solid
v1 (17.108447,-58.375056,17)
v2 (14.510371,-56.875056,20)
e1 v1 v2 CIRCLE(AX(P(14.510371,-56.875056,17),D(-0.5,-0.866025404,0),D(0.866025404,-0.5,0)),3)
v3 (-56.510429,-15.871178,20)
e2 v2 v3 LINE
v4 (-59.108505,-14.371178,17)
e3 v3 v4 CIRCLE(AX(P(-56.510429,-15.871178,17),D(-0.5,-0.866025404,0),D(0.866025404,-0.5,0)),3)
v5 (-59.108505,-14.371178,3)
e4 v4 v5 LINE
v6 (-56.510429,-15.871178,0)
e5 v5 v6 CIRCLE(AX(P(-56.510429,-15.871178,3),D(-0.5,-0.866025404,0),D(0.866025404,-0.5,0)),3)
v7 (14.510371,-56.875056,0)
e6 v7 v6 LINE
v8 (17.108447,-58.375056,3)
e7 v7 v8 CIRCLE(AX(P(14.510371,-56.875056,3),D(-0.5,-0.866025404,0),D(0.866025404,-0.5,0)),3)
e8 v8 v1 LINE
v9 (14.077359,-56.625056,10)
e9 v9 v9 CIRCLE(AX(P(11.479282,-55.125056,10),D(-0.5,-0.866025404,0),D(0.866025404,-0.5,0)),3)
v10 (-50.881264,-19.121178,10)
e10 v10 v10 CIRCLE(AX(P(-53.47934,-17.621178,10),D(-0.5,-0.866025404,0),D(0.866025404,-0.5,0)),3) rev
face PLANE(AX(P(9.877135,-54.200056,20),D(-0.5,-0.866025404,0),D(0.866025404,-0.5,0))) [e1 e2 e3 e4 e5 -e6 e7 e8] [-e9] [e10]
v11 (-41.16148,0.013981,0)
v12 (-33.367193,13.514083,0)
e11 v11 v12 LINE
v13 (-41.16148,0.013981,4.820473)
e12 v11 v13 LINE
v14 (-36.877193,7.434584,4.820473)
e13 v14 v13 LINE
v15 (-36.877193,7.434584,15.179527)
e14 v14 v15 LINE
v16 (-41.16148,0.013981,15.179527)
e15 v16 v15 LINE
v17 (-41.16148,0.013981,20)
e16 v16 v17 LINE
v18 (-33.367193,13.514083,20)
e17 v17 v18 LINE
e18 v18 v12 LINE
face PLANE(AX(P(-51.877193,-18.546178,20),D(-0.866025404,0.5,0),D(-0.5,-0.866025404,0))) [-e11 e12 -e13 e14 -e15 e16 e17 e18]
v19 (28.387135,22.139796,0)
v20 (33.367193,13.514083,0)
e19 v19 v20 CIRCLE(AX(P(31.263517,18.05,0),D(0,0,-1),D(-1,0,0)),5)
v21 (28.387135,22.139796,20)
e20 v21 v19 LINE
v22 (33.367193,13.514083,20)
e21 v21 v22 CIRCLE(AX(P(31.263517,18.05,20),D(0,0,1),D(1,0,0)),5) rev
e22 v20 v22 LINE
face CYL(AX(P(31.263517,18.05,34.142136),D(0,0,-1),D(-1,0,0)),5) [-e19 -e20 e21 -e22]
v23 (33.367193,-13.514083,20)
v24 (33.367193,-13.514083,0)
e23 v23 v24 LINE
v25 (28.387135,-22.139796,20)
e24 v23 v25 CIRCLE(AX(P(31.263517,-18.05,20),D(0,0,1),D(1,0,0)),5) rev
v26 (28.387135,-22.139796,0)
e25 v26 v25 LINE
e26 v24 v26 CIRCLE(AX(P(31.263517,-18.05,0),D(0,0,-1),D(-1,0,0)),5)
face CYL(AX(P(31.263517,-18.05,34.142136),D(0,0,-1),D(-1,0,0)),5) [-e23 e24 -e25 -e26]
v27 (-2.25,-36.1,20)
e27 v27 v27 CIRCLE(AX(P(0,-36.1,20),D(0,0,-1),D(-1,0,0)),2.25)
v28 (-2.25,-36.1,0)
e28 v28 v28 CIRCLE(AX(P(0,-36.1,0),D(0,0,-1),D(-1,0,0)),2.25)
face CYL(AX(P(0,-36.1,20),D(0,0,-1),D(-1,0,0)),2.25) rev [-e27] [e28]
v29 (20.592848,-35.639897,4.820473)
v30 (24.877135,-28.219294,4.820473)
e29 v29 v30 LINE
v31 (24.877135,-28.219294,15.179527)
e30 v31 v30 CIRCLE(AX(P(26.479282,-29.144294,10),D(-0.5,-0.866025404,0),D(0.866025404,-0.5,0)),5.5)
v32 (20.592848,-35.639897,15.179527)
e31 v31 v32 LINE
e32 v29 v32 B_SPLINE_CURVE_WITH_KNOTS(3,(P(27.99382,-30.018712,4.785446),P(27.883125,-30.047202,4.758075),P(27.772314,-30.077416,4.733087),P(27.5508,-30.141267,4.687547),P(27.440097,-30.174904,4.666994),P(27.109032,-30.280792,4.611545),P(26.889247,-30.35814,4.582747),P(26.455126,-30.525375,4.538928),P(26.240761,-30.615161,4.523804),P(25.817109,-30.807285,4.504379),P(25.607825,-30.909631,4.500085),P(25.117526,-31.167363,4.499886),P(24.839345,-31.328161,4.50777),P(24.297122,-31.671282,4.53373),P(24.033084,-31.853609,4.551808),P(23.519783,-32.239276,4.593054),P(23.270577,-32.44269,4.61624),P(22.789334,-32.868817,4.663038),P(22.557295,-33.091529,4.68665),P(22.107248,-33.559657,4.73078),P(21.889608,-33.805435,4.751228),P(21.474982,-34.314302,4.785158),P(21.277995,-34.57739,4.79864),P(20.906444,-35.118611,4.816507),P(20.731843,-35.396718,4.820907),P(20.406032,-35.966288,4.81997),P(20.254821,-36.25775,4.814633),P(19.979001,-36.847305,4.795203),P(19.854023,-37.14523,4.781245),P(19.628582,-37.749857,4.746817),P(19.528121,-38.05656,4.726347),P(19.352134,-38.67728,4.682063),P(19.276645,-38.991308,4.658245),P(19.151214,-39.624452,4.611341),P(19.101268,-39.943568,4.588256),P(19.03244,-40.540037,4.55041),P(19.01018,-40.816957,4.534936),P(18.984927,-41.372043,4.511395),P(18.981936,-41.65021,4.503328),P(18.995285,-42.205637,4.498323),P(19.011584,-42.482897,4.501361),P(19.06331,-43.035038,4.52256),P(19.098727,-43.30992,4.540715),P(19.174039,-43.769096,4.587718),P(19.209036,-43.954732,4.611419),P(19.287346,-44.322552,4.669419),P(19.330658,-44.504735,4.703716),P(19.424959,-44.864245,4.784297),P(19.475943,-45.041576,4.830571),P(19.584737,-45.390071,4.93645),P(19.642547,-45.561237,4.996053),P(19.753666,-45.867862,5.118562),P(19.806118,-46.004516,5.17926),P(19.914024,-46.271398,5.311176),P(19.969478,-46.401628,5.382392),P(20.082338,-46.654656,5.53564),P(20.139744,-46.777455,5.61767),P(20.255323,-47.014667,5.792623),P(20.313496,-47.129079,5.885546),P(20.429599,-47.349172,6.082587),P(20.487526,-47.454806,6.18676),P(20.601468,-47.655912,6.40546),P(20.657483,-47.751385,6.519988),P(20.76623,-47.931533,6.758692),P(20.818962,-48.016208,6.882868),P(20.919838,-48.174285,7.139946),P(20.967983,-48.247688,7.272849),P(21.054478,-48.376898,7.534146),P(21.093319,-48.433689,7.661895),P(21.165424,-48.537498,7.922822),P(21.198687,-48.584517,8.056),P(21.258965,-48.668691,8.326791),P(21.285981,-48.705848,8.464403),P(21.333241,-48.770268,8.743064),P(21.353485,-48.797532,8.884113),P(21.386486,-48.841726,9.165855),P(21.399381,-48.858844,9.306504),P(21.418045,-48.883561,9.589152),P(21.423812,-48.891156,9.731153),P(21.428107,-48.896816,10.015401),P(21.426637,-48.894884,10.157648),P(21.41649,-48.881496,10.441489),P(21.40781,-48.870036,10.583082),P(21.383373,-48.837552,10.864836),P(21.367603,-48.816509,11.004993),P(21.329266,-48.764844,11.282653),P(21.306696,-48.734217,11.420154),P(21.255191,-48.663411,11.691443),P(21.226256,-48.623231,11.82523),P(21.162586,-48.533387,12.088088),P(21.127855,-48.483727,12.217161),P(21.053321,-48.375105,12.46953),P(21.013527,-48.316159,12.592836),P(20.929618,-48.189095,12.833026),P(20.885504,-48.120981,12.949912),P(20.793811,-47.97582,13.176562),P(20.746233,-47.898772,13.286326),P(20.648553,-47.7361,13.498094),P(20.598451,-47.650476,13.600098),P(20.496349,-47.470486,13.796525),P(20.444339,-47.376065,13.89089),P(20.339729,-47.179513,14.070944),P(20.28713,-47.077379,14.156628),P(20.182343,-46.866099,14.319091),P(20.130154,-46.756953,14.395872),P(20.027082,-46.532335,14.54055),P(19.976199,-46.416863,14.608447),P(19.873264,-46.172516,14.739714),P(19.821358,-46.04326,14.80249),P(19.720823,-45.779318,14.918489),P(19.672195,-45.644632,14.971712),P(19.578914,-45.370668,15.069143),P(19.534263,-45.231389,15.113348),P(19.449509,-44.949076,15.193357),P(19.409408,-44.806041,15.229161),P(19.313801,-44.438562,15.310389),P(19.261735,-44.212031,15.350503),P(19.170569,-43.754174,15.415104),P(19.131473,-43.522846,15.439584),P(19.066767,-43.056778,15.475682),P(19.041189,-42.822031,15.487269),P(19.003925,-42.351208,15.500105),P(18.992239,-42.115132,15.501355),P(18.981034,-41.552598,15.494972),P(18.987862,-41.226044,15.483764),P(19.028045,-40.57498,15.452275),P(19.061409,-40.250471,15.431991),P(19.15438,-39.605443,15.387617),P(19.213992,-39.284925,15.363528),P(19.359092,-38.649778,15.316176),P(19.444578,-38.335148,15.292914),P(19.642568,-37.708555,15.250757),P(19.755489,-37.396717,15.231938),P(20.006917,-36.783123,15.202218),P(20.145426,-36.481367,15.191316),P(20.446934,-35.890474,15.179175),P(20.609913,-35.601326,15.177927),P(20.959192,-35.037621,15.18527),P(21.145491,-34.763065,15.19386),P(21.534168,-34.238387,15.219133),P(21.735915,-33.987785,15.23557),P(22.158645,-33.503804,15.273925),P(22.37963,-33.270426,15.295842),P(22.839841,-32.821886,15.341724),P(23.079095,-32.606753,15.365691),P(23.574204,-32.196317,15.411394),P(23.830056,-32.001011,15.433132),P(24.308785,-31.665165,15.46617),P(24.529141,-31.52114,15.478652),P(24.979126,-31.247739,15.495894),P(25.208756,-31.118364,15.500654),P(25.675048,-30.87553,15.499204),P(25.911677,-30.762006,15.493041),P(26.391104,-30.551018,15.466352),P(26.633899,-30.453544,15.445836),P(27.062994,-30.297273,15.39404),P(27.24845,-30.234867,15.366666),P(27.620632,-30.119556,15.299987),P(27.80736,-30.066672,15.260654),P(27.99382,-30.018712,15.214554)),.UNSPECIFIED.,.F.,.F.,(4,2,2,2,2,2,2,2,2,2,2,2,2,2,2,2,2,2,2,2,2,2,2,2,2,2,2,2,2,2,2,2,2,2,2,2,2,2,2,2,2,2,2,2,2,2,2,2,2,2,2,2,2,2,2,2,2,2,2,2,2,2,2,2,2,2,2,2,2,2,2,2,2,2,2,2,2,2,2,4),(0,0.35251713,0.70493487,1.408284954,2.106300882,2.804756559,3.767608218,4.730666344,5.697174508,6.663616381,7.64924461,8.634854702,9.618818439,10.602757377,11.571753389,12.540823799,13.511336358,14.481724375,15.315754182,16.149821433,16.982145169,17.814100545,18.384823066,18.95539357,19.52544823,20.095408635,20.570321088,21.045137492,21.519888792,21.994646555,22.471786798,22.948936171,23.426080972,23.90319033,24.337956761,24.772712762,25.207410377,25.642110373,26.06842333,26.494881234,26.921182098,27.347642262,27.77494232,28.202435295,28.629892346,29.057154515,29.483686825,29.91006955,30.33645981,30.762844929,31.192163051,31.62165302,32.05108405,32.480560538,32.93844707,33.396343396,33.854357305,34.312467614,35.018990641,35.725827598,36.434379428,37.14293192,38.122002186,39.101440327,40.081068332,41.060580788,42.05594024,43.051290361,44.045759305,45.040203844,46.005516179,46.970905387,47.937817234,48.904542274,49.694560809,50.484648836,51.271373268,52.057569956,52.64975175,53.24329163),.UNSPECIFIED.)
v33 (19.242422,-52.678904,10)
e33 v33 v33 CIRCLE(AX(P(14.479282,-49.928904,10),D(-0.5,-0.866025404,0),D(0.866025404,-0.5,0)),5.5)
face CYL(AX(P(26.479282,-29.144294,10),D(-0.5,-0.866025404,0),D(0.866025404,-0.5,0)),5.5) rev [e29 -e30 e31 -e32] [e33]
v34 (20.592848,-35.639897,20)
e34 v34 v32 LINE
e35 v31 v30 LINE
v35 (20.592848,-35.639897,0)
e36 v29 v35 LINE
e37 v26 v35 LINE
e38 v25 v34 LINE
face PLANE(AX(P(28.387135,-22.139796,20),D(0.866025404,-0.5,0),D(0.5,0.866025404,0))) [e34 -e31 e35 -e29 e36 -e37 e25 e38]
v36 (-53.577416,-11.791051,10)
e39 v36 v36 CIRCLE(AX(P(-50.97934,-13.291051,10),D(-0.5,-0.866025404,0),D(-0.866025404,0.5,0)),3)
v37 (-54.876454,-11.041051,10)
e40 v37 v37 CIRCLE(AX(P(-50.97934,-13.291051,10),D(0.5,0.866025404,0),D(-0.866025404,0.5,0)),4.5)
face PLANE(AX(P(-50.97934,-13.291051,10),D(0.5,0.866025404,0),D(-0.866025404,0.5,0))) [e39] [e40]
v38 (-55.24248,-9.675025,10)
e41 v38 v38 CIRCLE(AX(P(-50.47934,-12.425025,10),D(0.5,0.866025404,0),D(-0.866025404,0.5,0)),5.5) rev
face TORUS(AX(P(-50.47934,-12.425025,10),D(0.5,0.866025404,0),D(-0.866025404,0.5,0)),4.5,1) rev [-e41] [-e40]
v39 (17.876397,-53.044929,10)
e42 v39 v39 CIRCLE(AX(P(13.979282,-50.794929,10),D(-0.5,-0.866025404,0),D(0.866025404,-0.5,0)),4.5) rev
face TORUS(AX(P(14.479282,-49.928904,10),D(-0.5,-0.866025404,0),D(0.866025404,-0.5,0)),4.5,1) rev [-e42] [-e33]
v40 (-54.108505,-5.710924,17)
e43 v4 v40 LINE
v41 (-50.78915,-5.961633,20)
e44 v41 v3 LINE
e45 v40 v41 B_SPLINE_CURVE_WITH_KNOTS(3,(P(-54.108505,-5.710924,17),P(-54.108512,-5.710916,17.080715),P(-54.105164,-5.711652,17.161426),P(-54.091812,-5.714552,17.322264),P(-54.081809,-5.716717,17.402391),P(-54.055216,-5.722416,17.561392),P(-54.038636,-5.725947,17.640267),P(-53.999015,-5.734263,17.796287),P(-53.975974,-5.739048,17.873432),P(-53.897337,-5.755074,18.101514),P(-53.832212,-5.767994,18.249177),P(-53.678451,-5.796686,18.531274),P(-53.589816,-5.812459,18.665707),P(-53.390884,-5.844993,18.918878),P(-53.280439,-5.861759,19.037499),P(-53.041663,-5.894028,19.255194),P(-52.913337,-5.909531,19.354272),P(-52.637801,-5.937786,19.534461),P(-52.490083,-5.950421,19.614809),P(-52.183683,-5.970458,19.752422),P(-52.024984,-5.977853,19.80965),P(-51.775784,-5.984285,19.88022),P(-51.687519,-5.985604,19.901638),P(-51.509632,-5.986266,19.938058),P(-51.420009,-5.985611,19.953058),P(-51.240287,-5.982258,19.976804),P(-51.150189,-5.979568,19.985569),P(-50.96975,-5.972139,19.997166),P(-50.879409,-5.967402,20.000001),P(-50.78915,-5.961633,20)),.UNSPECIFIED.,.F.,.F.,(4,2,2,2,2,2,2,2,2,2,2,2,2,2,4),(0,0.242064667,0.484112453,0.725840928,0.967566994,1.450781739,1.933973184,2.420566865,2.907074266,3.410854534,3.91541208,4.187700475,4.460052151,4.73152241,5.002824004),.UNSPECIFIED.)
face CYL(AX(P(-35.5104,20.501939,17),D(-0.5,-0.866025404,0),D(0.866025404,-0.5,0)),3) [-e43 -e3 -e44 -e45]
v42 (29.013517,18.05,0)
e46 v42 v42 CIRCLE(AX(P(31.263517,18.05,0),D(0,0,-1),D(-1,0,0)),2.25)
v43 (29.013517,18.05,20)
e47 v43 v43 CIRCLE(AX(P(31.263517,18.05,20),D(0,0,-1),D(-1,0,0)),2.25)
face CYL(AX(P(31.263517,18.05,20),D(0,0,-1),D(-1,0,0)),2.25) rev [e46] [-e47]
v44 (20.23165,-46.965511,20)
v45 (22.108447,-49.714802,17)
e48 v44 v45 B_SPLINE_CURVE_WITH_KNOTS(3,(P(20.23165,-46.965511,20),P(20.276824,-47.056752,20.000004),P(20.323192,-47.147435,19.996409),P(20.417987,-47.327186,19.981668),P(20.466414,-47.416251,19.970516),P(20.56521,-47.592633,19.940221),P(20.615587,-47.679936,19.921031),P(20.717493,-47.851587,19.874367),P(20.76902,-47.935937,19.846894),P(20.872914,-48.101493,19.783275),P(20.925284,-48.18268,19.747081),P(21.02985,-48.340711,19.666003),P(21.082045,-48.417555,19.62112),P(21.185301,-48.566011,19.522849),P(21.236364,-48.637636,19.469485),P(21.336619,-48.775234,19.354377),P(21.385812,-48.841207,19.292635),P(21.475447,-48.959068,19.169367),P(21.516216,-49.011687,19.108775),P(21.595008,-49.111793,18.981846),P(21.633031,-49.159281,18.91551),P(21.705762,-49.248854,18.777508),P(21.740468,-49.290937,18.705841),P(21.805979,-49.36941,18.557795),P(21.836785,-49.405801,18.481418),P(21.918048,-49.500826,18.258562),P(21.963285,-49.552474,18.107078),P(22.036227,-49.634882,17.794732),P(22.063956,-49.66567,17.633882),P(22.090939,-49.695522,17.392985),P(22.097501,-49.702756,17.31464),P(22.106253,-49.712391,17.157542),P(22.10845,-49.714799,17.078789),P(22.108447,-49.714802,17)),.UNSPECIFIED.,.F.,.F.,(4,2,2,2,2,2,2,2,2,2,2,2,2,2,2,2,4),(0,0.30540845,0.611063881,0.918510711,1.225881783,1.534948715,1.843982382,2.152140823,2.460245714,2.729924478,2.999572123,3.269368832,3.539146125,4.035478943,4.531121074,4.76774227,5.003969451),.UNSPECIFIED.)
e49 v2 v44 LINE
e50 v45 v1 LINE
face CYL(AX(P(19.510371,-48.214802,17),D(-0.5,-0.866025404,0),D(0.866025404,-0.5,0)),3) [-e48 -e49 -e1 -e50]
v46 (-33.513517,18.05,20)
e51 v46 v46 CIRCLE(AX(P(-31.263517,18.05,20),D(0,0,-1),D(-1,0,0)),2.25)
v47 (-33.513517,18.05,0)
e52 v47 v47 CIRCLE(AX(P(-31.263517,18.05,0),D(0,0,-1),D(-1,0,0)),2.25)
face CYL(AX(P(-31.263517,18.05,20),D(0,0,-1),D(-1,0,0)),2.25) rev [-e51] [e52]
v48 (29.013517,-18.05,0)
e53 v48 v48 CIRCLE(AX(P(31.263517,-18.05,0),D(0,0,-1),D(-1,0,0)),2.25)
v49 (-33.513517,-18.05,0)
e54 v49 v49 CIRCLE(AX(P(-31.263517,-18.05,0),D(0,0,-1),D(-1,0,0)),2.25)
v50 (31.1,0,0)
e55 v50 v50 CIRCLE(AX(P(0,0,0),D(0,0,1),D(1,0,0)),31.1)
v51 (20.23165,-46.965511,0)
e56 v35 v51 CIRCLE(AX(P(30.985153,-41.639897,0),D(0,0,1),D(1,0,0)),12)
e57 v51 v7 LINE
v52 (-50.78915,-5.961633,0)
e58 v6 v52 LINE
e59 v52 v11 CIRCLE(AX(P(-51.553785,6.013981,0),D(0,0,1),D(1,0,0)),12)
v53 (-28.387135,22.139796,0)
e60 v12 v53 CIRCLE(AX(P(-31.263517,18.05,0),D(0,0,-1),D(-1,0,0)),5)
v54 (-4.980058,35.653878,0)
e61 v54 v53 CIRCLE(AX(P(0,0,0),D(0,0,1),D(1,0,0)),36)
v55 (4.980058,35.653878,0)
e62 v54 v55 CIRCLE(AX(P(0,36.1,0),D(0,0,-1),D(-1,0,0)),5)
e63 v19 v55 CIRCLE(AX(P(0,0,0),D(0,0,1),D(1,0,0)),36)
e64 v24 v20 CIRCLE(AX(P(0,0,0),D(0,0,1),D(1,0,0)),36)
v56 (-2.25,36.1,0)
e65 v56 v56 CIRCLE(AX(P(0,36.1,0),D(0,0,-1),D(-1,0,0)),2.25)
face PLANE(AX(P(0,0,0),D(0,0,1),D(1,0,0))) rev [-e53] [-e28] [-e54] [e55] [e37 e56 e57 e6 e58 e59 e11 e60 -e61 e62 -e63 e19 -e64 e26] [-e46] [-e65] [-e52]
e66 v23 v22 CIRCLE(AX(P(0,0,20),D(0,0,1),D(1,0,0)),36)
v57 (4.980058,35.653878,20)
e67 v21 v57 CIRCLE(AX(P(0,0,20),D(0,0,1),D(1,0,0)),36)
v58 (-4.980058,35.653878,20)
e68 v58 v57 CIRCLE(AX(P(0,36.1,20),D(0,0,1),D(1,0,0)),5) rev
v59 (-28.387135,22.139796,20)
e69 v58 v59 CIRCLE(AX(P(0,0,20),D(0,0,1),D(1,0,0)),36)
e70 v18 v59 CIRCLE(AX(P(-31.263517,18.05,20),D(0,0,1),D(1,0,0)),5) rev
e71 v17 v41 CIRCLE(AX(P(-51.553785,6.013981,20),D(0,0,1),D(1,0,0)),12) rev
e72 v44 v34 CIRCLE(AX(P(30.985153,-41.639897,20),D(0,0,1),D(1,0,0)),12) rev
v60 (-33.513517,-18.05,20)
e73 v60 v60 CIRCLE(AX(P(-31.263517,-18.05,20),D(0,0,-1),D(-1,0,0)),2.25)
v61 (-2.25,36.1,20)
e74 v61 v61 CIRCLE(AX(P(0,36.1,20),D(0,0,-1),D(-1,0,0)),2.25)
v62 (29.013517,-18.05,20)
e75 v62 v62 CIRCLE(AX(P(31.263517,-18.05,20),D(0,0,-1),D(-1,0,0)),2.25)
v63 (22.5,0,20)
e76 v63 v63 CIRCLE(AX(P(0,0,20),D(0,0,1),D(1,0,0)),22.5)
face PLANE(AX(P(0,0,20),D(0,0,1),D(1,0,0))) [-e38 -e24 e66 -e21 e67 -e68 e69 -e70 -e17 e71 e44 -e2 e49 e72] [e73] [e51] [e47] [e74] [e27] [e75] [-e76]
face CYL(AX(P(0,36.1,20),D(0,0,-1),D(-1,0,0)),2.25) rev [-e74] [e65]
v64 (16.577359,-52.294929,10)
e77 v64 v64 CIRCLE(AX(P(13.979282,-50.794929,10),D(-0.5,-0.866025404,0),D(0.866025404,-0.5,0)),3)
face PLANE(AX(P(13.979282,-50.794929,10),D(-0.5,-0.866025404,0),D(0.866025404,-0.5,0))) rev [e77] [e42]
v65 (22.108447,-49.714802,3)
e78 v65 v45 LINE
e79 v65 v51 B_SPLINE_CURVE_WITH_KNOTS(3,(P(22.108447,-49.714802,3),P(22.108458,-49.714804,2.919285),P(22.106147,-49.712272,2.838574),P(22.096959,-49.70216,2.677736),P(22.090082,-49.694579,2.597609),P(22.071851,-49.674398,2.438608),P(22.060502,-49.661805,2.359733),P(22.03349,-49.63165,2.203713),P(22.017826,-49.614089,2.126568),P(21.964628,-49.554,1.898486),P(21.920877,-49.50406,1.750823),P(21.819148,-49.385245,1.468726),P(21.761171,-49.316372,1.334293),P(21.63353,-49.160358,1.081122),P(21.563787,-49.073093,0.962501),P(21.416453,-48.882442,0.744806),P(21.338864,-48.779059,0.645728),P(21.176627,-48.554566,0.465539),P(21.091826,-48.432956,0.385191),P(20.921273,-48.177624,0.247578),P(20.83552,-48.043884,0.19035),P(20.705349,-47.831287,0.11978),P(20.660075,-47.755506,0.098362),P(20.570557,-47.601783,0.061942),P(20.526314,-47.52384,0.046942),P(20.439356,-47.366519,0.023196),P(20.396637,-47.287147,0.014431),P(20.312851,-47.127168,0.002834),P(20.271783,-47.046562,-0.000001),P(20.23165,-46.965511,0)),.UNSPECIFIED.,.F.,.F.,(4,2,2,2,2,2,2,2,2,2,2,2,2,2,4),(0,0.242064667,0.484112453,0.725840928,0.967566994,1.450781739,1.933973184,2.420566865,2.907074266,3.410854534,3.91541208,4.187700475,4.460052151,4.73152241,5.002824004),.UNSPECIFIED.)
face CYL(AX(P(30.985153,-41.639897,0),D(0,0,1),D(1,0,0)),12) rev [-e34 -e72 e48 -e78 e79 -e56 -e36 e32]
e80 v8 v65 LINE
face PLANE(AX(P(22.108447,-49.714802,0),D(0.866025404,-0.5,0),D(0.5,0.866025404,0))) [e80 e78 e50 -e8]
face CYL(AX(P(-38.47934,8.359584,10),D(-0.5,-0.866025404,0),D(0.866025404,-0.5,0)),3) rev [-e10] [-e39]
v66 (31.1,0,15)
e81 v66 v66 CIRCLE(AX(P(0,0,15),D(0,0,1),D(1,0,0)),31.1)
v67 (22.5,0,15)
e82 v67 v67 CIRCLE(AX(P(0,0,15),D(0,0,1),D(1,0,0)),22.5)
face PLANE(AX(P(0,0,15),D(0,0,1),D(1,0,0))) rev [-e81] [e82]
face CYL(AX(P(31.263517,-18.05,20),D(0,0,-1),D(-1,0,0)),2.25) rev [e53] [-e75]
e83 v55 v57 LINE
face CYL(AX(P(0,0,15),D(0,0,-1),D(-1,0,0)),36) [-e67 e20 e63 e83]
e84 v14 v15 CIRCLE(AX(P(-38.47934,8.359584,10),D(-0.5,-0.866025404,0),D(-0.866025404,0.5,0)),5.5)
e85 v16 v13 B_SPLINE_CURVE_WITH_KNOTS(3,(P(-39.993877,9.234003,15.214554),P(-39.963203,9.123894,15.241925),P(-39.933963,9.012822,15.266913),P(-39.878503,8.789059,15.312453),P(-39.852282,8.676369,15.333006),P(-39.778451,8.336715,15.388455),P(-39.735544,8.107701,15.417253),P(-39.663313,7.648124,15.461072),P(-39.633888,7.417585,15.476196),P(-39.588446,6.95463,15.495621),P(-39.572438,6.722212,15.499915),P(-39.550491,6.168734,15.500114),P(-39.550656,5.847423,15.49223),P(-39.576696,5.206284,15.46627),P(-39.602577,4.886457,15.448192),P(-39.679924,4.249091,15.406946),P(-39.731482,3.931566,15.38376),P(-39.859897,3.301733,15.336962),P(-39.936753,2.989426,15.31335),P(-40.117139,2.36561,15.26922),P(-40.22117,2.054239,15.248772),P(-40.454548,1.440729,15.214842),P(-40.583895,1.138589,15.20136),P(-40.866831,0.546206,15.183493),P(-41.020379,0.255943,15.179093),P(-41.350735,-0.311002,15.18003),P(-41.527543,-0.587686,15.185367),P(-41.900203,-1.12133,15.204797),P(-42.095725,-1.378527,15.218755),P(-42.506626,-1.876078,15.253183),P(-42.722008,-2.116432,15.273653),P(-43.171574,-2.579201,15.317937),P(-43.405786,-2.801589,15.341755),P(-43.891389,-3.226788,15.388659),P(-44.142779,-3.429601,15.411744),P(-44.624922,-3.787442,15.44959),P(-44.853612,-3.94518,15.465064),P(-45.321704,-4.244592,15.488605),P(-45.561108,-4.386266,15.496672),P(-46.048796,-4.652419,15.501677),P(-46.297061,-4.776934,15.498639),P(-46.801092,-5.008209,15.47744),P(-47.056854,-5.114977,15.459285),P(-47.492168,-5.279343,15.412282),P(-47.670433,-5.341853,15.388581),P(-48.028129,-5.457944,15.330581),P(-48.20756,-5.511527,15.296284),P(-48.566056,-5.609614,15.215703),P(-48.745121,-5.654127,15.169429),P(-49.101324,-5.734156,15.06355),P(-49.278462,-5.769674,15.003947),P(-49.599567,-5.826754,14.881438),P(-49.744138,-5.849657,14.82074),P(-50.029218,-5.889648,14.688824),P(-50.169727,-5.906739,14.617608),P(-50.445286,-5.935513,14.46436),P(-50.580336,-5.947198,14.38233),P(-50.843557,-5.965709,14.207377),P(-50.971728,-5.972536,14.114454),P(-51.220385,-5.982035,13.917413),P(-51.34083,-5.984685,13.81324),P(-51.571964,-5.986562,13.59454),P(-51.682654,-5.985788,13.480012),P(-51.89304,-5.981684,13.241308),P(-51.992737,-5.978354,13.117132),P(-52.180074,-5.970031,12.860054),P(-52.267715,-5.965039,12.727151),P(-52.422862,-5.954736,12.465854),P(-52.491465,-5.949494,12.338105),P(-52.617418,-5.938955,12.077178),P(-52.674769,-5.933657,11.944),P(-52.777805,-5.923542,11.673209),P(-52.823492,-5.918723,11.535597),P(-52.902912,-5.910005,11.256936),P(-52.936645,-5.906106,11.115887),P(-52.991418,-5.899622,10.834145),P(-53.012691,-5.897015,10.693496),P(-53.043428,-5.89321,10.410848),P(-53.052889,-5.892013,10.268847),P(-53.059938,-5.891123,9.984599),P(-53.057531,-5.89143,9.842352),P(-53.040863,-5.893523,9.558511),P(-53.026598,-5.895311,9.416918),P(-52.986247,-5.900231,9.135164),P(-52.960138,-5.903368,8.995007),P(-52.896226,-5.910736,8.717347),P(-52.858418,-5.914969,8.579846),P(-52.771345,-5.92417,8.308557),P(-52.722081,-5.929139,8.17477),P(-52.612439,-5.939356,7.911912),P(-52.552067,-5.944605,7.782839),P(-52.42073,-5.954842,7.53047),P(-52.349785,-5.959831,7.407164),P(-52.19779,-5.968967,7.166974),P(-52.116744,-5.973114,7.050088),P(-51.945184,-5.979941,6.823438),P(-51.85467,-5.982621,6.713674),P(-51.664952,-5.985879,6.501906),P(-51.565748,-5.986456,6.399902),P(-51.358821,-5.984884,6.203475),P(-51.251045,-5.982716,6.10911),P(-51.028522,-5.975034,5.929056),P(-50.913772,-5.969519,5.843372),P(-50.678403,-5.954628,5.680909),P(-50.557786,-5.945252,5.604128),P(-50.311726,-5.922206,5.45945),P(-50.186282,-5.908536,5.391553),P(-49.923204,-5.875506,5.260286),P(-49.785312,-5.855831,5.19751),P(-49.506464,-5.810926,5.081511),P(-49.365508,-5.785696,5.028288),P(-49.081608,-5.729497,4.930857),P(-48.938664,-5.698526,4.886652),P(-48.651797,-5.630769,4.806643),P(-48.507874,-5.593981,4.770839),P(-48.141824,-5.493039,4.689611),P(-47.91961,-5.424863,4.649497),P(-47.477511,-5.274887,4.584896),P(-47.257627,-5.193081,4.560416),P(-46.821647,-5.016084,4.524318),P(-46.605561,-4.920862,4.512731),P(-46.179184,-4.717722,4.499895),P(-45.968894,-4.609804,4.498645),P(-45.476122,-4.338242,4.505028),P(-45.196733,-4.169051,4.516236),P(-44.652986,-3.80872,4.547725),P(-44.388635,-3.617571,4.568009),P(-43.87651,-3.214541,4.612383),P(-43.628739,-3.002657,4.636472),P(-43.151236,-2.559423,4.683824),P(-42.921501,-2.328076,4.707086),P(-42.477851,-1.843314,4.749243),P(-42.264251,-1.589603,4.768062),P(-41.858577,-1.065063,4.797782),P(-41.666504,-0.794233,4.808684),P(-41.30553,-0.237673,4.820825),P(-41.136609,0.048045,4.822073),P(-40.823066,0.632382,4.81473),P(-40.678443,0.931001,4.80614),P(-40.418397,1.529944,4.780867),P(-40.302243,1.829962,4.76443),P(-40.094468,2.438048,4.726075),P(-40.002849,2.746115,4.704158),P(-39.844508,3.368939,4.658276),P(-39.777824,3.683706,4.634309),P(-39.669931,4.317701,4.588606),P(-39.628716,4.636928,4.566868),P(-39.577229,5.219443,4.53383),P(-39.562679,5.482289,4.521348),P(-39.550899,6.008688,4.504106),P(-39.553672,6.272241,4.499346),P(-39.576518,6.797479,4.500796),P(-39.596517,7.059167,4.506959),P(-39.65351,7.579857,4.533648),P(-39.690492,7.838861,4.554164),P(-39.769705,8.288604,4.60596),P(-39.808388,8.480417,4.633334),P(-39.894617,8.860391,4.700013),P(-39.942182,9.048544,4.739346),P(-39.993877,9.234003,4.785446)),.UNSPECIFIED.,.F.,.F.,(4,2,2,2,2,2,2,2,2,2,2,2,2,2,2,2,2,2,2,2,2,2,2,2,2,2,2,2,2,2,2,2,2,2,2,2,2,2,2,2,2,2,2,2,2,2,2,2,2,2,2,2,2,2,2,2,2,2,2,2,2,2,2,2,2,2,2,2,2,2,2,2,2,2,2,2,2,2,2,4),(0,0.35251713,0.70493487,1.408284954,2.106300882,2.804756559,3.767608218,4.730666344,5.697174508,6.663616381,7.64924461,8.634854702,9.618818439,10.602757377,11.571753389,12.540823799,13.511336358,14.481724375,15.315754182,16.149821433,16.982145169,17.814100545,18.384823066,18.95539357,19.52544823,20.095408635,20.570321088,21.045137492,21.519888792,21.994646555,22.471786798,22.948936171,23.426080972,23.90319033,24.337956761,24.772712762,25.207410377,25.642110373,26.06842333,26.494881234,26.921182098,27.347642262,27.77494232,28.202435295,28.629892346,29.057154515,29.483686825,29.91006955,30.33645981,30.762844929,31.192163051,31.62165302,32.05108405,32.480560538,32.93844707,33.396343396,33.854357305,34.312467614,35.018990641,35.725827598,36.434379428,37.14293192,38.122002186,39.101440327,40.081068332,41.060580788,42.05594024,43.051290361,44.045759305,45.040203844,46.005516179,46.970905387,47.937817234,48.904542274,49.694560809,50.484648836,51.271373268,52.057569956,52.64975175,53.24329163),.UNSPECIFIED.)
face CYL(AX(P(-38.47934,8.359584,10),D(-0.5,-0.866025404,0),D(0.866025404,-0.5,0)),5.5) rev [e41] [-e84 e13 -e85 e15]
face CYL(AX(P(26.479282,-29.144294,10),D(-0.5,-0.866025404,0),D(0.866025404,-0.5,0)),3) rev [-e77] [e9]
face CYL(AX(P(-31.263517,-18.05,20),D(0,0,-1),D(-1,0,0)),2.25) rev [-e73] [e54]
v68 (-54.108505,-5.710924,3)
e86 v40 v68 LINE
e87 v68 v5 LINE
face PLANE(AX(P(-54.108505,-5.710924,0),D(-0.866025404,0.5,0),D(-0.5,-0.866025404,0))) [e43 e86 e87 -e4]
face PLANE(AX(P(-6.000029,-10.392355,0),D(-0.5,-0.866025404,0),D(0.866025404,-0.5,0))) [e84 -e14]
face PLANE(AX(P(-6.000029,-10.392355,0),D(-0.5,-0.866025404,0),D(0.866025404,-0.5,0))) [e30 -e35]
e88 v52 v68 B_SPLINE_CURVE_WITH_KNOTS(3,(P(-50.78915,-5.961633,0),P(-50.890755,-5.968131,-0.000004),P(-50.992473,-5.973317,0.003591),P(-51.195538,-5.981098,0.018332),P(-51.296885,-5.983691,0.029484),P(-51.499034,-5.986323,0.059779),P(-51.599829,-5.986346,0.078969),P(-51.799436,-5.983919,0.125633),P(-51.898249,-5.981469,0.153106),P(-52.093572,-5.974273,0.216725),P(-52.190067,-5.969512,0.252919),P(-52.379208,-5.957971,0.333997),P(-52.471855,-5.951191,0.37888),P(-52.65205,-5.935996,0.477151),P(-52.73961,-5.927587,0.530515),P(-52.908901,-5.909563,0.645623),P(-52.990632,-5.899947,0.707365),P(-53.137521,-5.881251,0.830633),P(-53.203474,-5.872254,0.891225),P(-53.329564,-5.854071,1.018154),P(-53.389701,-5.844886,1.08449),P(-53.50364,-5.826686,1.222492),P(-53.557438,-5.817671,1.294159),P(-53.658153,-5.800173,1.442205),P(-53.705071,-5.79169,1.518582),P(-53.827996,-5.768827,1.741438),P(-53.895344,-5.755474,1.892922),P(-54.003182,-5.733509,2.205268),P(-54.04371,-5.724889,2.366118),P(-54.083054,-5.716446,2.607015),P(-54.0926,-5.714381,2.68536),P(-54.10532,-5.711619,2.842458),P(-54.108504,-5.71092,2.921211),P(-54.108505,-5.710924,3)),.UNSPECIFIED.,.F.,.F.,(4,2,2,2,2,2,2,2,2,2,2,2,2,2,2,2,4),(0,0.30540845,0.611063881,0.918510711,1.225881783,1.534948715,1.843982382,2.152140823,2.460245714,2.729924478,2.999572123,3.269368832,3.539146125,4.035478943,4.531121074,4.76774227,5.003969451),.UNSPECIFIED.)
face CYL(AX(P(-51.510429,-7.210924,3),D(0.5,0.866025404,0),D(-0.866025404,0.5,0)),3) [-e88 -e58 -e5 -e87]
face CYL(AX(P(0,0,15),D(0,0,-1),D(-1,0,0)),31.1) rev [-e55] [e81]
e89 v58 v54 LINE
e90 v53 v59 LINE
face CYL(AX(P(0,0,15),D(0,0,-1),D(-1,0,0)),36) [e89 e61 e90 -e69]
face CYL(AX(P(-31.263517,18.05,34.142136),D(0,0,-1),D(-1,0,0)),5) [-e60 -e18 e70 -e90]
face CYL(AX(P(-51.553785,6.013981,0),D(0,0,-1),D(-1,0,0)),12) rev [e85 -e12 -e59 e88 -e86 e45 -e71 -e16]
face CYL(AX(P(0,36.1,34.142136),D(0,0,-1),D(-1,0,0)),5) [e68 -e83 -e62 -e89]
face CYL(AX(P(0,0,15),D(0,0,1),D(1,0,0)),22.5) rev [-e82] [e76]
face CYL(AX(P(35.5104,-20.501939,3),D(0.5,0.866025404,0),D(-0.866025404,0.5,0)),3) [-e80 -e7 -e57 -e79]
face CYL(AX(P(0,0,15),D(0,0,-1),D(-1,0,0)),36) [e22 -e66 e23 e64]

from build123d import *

# Parameters (mm, degrees)
SKETCH1_R           = 36
SKETCH1_R_2         = 31.1
BOSS_EXTRUDE1_DEPTH = 15
SKETCH2_R           = 36
BOSS_EXTRUDE2_DEPTH = 5
SKETCH3_R           = 22.5
CUT_EXTRUDE1_DEPTH  = 5
SKETCH4_R           = 5
BOSS_EXTRUDE3_DEPTH = 20
BOSS_EXTRUDE4_DEPTH = 20
SKETCH7_R           = 2.25
CUT_EXTRUDE2_DEPTH  = 78.645922206
SKETCH9_W           = 8.35
SKETCH9_H           = 20
BOSS_EXTRUDE5_DEPTH = 10
FILLET1_R           = 12
SKETCH10_R          = 3
CUT_EXTRUDE3_DEPTH  = 30
CUT_EXTRUDE5_START  = -5
SKETCH10_4_R        = 5.5
SKETCH10_4_R_2      = 3
CUT_EXTRUDE5_DEPTH  = 25
FILLET2_R           = 3
FILLET3_R           = 1


with BuildPart() as part:
    # Sketch1 → Boss-Extrude1 (new body)
    with BuildSketch(Plane.XY):
        Circle(SKETCH1_R)
        Circle(SKETCH1_R_2, mode=Mode.SUBTRACT)
    extrude(amount=BOSS_EXTRUDE1_DEPTH)

    # Sketch2 → Boss-Extrude2 (add)
    with BuildSketch(Plane.XY.offset(15)):
        Circle(SKETCH2_R)
    extrude(amount=BOSS_EXTRUDE2_DEPTH)

    # Sketch3 → Cut-Extrude1 (cut)
    with BuildSketch(Plane.XY.offset(20)):
        Circle(SKETCH3_R)
    extrude(amount=-CUT_EXTRUDE1_DEPTH, mode=Mode.SUBTRACT)

    # Sketch4 → Boss-Extrude3 (add)
    with BuildSketch(Plane(origin=(0, 0, 0), x_dir=(-1, 0, 0), z_dir=(0, 0, -1))):
        with Locations((0, 36.1)):
            Circle(SKETCH4_R)
        with Locations((31.263517077, 18.05)):
            Circle(SKETCH4_R)
        with Locations((31.263517077, -18.05)):
            Circle(SKETCH4_R)
        with Locations((0, -36.1)):
            Circle(SKETCH4_R)
        with Locations((-31.263517077, -18.05)):
            Circle(SKETCH4_R)
        with Locations((-31.263517077, 18.05)):
            Circle(SKETCH4_R)
    extrude(amount=-BOSS_EXTRUDE3_DEPTH)

    # Sketch8 → Boss-Extrude4 (add)
    with BuildSketch(Plane(origin=(0, 0, 0), x_dir=(-1, 0, 0), z_dir=(0, 0, -1))):
        with BuildLine():
            Line((-28.387135314, -22.139795588), (-9.877135314, -54.200056036))
            Line((-9.877135314, -54.200056036), (51.877193071, -18.54617792))
            Line((51.877193071, -18.54617792), (33.367193071, 13.514082528))
            ThreePointArc((33.367193071, 13.514082528), (18, -31.176914536), (-28.387135314, -22.139795588))
        make_face()
    extrude(amount=-BOSS_EXTRUDE4_DEPTH)

    # Sketch7 → Cut-Extrude2 (cut, through all)
    with BuildSketch(Plane(origin=(0, 0, 0), x_dir=(-1, 0, 0), z_dir=(0, 0, -1))):
        with Locations((-31.263517077, 18.05)):
            Circle(SKETCH7_R)
        with Locations((0, 36.1)):
            Circle(SKETCH7_R)
        with Locations((31.263517077, 18.05)):
            Circle(SKETCH7_R)
        with Locations((31.263517077, -18.05)):
            Circle(SKETCH7_R)
        with Locations((0, -36.1)):
            Circle(SKETCH7_R)
        with Locations((-31.263517077, -18.05)):
            Circle(SKETCH7_R)
    extrude(amount=-CUT_EXTRUDE2_DEPTH, mode=Mode.SUBTRACT)

    # Sketch9 → Boss-Extrude5 (add)
    with BuildSketch(Plane(origin=(-21.000028879, -36.373116978, 0), x_dir=(0.8660254037844385, -0.5000000000000004, 0), z_dir=(-0.5000000000000003, -0.8660254037844384, 0))):
        with Locations((-39.828878116, 10)):
            Rectangle(SKETCH9_W, SKETCH9_H)
        with Locations((39.828878116, 10)):
            Rectangle(SKETCH9_W, SKETCH9_H)
    extrude(amount=-BOSS_EXTRUDE5_DEPTH)

    # Fillet1
    # the kernel refuses this fillet: 12 mm, written as the material it adds along each edge
    with BuildSketch(Plane(origin=(-46.877193071, -9.885923882, 20), x_dir=(-0.8660254037844379, 0.500000000000001, 0), z_dir=(0, 0, -1))) as fillet1_piece_1:
        with BuildLine():
            CenterArc((12, 11.431425983), FILLET1_R, 180, 72.29196439)
            Line((0, 11.431425983), (-0.24, 11.431425983))
            Line((-0.24, 11.431425983), (-0.24, 0))
            Line((-0.24, 0), (0, -0.24))
            ThreePointArc((0, -0.24), (4.175, -0.24), (8.277, -0.22862852))
            Line((8.277, -0.22862852), (8.35, 0))
        make_face()
    extrude(amount=20)
    with BuildSketch(Plane(origin=(14.877135314, -45.539801998, 20), x_dir=(0.5000000000000003, 0.8660254037844385, 0), z_dir=(0, 0, -1))) as fillet1_piece_2:
        with BuildLine():
            CenterArc((11.431425983, 12), FILLET1_R, 197.70803561, 72.29196439)
            Line((0, 8.35), (-0.22862852, 8.277))
            ThreePointArc((-0.22862852, 8.277), (-0.24, 4.175), (-0.24, 0))
            Line((-0.24, 0), (0, -0.24))
            Line((0, -0.24), (11.431425983, -0.24))
            Line((11.431425983, -0.24), (11.431425983, 0))
        make_face()
    extrude(amount=20)

    # Sketch10 → Cut-Extrude3 (cut)
    with BuildSketch(Plane(origin=(-21.000028879, -36.373116978, 0), x_dir=(0.8660254037844385, -0.5000000000000004, 0), z_dir=(-0.5000000000000003, -0.8660254037844384, 0))):
        with Locations((37.503878116, 10)):
            Circle(SKETCH10_R)
        with Locations((-37.503878116, 10)):
            Circle(SKETCH10_R)
    extrude(amount=-CUT_EXTRUDE3_DEPTH, mode=Mode.SUBTRACT)

    # Sketch10<4> → Cut-Extrude5 (cut)
    # profile 1 of 2: a face of its own
    with BuildSketch(Plane(origin=(-21.000028879, -36.373116978, 0), x_dir=(0.8660254037844385, -0.5000000000000004, 0), z_dir=(-0.5000000000000003, -0.8660254037844384, 0)).offset(CUT_EXTRUDE5_START)):
        with Locations((37.503878116, 10)):
            Circle(SKETCH10_4_R)
        with Locations((37.503878116, 10)):
            Circle(SKETCH10_4_R_2, mode=Mode.SUBTRACT)
    # profile 2 of 2: a face of its own
    with BuildSketch(Plane(origin=(-21.000028879, -36.373116978, 0), x_dir=(0.8660254037844385, -0.5000000000000004, 0), z_dir=(-0.5000000000000003, -0.8660254037844384, 0)).offset(CUT_EXTRUDE5_START)):
        with Locations(Location((-37.503878116, 10, 0), (0, 0, 289.655481315))):
            Circle(SKETCH10_4_R)
        with Locations((-37.503878116, 10)):
            Circle(SKETCH10_4_R_2, mode=Mode.SUBTRACT)
    extrude(amount=-CUT_EXTRUDE5_DEPTH, mode=Mode.SUBTRACT)

    # Fillet2
    fillet2_edges = [part.edges().sort_by_distance(p)[0] for p in [
        (-56.608505192, -10.041050901, 0),
        (-56.608505192, -10.041050901, 20),
        (19.608447435, -54.044929017, 0),
        (19.608447435, -54.044929017, 20),
    ]]
    fillet(fillet2_edges, radius=FILLET2_R)

    # Fillet3
    fillet3_edges = [part.edges().sort_by_distance(p)[0] for p in [
        (-52.581487065, -12.366050901, 15.179527005),
        (9.21614259, -48.044929017, 10),
    ]]
    fillet(fillet3_edges, radius=FILLET3_R)


solid = part.part
